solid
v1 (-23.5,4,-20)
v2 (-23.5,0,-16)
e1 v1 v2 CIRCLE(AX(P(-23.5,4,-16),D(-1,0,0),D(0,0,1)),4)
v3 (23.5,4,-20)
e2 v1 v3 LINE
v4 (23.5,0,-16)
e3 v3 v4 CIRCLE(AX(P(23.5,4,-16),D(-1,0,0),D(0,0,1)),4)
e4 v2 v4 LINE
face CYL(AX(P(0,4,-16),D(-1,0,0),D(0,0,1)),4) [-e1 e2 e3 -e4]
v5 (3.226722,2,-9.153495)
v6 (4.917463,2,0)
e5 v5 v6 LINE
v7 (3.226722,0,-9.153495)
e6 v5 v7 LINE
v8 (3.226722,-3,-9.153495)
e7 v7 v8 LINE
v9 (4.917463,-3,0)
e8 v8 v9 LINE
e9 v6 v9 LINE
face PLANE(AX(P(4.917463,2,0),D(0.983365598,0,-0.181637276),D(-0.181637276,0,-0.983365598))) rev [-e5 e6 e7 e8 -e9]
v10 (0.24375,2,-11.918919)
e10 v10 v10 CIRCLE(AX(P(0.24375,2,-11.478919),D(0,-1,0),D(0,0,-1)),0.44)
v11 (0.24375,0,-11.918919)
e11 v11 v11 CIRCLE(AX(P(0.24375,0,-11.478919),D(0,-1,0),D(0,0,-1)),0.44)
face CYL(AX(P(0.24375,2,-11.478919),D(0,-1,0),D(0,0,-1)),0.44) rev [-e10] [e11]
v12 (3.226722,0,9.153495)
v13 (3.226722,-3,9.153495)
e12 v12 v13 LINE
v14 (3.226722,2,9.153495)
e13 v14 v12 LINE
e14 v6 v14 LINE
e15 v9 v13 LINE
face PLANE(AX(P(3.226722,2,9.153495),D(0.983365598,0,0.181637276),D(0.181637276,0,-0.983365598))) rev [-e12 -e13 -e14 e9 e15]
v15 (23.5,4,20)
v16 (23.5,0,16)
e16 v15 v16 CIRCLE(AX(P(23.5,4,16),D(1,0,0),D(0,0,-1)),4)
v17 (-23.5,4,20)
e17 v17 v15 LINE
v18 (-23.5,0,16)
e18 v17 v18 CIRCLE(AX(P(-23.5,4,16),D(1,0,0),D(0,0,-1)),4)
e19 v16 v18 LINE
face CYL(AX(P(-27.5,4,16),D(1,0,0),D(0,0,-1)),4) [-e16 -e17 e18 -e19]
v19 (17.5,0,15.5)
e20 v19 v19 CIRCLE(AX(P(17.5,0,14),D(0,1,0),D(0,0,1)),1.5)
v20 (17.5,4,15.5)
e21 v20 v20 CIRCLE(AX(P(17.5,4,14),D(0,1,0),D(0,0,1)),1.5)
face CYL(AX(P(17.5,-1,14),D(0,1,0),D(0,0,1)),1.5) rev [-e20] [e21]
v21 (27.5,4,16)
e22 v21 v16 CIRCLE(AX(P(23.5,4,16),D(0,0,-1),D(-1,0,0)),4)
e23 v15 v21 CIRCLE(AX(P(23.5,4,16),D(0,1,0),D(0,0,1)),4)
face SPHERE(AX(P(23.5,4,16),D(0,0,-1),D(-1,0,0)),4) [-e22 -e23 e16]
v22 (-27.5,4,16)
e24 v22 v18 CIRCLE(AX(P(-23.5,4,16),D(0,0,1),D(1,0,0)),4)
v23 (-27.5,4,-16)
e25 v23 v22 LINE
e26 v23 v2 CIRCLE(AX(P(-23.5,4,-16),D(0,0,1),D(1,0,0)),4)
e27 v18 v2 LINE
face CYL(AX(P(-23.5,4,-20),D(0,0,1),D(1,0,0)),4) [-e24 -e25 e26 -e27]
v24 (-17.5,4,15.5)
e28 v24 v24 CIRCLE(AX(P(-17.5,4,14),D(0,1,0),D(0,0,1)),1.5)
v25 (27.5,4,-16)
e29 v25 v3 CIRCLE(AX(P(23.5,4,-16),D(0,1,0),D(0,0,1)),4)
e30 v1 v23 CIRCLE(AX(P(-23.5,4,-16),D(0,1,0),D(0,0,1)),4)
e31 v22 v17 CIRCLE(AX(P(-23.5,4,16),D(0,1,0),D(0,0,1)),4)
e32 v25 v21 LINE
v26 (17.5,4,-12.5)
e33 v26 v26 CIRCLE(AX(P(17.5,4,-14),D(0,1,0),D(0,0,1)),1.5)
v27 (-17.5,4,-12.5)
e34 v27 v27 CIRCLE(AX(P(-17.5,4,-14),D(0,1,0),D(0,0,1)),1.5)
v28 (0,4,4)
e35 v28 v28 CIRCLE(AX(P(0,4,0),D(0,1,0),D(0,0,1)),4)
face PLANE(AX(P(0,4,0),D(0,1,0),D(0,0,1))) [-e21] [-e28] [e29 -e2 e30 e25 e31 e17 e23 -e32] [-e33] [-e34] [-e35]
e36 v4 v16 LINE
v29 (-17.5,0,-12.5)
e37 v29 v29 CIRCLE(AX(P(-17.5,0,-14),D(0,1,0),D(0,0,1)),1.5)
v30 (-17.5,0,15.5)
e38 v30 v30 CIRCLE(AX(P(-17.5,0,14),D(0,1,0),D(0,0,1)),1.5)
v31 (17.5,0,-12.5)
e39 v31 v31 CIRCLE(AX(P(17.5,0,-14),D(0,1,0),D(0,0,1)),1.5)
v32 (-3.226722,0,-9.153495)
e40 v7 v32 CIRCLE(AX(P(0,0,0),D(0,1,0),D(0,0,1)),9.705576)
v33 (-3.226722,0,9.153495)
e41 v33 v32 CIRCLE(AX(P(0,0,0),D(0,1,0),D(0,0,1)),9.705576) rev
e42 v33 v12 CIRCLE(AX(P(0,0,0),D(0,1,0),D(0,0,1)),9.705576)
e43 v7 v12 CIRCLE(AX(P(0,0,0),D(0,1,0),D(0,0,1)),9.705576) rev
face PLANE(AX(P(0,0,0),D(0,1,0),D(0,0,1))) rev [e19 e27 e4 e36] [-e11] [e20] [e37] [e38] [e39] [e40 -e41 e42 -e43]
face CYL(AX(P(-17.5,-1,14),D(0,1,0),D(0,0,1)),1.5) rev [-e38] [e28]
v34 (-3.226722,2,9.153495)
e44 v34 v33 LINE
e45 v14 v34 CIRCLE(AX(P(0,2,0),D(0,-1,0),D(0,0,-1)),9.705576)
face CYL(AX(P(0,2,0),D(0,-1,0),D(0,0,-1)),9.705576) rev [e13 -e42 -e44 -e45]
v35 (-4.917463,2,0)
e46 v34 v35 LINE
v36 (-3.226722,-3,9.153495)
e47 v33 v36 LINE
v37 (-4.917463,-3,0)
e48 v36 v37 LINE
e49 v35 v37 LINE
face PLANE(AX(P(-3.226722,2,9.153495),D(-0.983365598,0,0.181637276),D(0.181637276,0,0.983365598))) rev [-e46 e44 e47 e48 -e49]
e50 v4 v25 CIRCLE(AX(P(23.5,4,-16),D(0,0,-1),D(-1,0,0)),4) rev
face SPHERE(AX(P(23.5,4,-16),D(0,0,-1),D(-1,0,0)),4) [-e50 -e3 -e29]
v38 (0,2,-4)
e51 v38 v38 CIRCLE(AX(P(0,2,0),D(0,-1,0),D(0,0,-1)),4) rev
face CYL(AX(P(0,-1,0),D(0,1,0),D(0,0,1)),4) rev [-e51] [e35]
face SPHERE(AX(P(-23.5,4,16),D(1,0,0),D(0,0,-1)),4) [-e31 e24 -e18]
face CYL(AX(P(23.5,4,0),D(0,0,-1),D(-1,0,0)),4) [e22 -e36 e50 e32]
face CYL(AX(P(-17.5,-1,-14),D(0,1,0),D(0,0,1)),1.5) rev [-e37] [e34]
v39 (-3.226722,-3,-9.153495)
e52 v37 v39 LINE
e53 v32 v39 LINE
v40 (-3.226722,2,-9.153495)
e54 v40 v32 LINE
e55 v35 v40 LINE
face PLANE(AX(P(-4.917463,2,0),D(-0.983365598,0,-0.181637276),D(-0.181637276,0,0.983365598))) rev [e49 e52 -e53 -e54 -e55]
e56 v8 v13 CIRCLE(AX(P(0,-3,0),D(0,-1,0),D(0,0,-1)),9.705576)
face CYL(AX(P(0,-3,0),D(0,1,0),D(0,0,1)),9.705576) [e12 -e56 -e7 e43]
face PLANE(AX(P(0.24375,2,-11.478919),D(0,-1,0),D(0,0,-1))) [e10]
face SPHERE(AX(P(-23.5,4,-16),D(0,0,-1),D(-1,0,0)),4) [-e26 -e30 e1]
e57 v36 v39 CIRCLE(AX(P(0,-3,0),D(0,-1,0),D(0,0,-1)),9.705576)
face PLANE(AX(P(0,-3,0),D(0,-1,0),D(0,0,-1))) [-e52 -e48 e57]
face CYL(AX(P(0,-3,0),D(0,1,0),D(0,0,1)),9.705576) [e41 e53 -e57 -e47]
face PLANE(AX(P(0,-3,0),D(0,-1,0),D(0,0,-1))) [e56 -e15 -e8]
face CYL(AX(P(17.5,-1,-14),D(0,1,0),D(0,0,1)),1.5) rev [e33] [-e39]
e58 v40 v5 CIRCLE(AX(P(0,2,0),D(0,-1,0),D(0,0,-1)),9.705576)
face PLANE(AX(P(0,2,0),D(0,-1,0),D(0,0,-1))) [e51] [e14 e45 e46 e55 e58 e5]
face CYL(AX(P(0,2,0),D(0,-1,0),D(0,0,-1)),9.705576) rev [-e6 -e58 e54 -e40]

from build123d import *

# Parameters (mm, degrees)
SKETCH_1_W             = 55
SKETCH_1_H             = 40
EXTRUDE_1_DEPTH        = 4
CUT_EXTRUDE_START      = 4
SKETCH_1_6_OUTSIDE_W   = 70.624
SKETCH_1_6_OUTSIDE_H   = 55.624
SKETCH_1_6_OUTSIDE_W_2 = 55
SKETCH_1_6_OUTSIDE_H_2 = 40
SKETCH_1_6_OUTSIDE_R   = 4
SKETCH_1_6_OUTSIDE_R_2 = 1.5
CUT_EXTRUDE_5_DEPTH    = 5
FILLET_4_R             = 4
FILLET_6_R             = 4
FILLET_7_R             = 4
FILLET_8_R             = 4
SKETCH_2_R             = 9.705576387
EXTRUDE_2_DEPTH        = 3
CUT_EXTRUDE_START_2    = -5
CUT_EXTRUDE_7_DEPTH    = 5
SKETCH_4_R             = 0.44
CUT_EXTRUDE_8_DEPTH    = 2


with BuildPart() as part:
    # 草图1 → 凸台-拉伸1 (new body)
    with BuildSketch(Plane(origin=(0, 0, 0), x_dir=(1, 0, 0), z_dir=(0, 1, 0))):
        Rectangle(SKETCH_1_W, SKETCH_1_H)
    extrude(amount=EXTRUDE_1_DEPTH)

    # 草图1<6> outside → 切除-拉伸5 (cut)
    # profile 1 of 6: a face of its own
    with BuildSketch(Plane(origin=(0, 0, 0), x_dir=(1, 0, 0), z_dir=(0, 1, 0)).offset(CUT_EXTRUDE_START)):
        Rectangle(SKETCH_1_6_OUTSIDE_W, SKETCH_1_6_OUTSIDE_H)
        Rectangle(SKETCH_1_6_OUTSIDE_W_2, SKETCH_1_6_OUTSIDE_H_2, mode=Mode.SUBTRACT)
    # profile 2 of 6: a face of its own
    with BuildSketch(Plane(origin=(0, 0, 0), x_dir=(1, 0, 0), z_dir=(0, 1, 0)).offset(CUT_EXTRUDE_START)):
        with Locations(Location((0, 0, 0), (0, 0, 270))):
            Circle(SKETCH_1_6_OUTSIDE_R)
    # profile 3 of 6: a face of its own
    with BuildSketch(Plane(origin=(0, 0, 0), x_dir=(1, 0, 0), z_dir=(0, 1, 0)).offset(CUT_EXTRUDE_START)):
        with Locations(Location((-17.5, 14, 0), (0, 0, 270))):
            Circle(SKETCH_1_6_OUTSIDE_R_2)
    # profile 4 of 6: a face of its own
    with BuildSketch(Plane(origin=(0, 0, 0), x_dir=(1, 0, 0), z_dir=(0, 1, 0)).offset(CUT_EXTRUDE_START)):
        with Locations(Location((17.5, 14, 0), (0, 0, 270))):
            Circle(SKETCH_1_6_OUTSIDE_R_2)
    # profile 5 of 6: a face of its own
    with BuildSketch(Plane(origin=(0, 0, 0), x_dir=(1, 0, 0), z_dir=(0, 1, 0)).offset(CUT_EXTRUDE_START)):
        with Locations(Location((17.5, -14, 0), (0, 0, 270))):
            Circle(SKETCH_1_6_OUTSIDE_R_2)
    # profile 6 of 6: a face of its own
    with BuildSketch(Plane(origin=(0, 0, 0), x_dir=(1, 0, 0), z_dir=(0, 1, 0)).offset(CUT_EXTRUDE_START)):
        with Locations(Location((-17.5, -14, 0), (0, 0, 270))):
            Circle(SKETCH_1_6_OUTSIDE_R_2)
    extrude(amount=-CUT_EXTRUDE_5_DEPTH, mode=Mode.SUBTRACT)

    # 圆角4
    fillet_4_edges = [part.edges().sort_by_distance(p)[0] for p in [
        (27.5, 0, 0),
    ]]
    fillet(fillet_4_edges, radius=FILLET_4_R - 0.0001)  # a hair under: the kernel refuses the full size

    # 圆角6
    fillet_6_edges = [part.edges().sort_by_distance(p)[0] for p in [
        (26.328456414, 1.171543586, 20),
        (-1.99995, 0, 20),
    ]]
    fillet(fillet_6_edges, radius=FILLET_6_R - 0.0001)  # a hair under: the kernel refuses the full size

    # 圆角7
    fillet_7_edges = [part.edges().sort_by_distance(p)[0] for p in [
        (-27.5, 1.171543586, 18.828456414),
        (-27.5, 0, -1.99995),
    ]]
    fillet(fillet_7_edges, radius=FILLET_7_R - 0.0001)  # a hair under: the kernel refuses the full size

    # 圆角8
    fillet_8_edges = [part.edges().sort_by_distance(p)[0] for p in [
        (26.328456414, 1.171543586, -20),
        (0, 0, -20),
        (-26.328456414, 1.171543586, -20),
    ]]
    fillet(fillet_8_edges, radius=FILLET_8_R - 0.0001)  # a hair under: the kernel refuses the full size

    # 草图2 → 凸台-拉伸2 (add)
    with BuildSketch(Plane.XZ):
        with Locations(Location((0, 0, 0), (0, 0, 90))):
            Circle(SKETCH_2_R)
    extrude(amount=EXTRUDE_2_DEPTH)

    # 草图3 → 切除-拉伸7 (cut)
    with BuildSketch(Plane(origin=(0, -3, 0), x_dir=(-1, 0, 0), z_dir=(0, -1, 0)).offset(CUT_EXTRUDE_START_2)):
        with BuildLine():
            Line((3.226722166, -9.153495347), (4.917462581, 0))
            Line((4.917462581, 0), (3.226722166, 9.153495347))
            ThreePointArc((3.226722166, 9.153495347), (0, 9.705576387), (-3.226722166, 9.153495347))
            Line((-3.226722166, 9.153495347), (-4.917462581, 0))
            Line((-4.917462581, 0), (-3.226722166, -9.153495347))
            ThreePointArc((-3.226722166, -9.153495347), (0, -9.705576387), (3.226722166, -9.153495347))
        make_face()
    extrude(amount=CUT_EXTRUDE_7_DEPTH, mode=Mode.SUBTRACT)

    # 草图4 → 切除-拉伸8 (cut)
    with BuildSketch(Plane.XZ):
        with Locations(Location((0.243749782, -11.478919209, 0), (0, 0, 270))):
            Circle(SKETCH_4_R)
    extrude(amount=-CUT_EXTRUDE_8_DEPTH, mode=Mode.SUBTRACT)


solid = part.part
